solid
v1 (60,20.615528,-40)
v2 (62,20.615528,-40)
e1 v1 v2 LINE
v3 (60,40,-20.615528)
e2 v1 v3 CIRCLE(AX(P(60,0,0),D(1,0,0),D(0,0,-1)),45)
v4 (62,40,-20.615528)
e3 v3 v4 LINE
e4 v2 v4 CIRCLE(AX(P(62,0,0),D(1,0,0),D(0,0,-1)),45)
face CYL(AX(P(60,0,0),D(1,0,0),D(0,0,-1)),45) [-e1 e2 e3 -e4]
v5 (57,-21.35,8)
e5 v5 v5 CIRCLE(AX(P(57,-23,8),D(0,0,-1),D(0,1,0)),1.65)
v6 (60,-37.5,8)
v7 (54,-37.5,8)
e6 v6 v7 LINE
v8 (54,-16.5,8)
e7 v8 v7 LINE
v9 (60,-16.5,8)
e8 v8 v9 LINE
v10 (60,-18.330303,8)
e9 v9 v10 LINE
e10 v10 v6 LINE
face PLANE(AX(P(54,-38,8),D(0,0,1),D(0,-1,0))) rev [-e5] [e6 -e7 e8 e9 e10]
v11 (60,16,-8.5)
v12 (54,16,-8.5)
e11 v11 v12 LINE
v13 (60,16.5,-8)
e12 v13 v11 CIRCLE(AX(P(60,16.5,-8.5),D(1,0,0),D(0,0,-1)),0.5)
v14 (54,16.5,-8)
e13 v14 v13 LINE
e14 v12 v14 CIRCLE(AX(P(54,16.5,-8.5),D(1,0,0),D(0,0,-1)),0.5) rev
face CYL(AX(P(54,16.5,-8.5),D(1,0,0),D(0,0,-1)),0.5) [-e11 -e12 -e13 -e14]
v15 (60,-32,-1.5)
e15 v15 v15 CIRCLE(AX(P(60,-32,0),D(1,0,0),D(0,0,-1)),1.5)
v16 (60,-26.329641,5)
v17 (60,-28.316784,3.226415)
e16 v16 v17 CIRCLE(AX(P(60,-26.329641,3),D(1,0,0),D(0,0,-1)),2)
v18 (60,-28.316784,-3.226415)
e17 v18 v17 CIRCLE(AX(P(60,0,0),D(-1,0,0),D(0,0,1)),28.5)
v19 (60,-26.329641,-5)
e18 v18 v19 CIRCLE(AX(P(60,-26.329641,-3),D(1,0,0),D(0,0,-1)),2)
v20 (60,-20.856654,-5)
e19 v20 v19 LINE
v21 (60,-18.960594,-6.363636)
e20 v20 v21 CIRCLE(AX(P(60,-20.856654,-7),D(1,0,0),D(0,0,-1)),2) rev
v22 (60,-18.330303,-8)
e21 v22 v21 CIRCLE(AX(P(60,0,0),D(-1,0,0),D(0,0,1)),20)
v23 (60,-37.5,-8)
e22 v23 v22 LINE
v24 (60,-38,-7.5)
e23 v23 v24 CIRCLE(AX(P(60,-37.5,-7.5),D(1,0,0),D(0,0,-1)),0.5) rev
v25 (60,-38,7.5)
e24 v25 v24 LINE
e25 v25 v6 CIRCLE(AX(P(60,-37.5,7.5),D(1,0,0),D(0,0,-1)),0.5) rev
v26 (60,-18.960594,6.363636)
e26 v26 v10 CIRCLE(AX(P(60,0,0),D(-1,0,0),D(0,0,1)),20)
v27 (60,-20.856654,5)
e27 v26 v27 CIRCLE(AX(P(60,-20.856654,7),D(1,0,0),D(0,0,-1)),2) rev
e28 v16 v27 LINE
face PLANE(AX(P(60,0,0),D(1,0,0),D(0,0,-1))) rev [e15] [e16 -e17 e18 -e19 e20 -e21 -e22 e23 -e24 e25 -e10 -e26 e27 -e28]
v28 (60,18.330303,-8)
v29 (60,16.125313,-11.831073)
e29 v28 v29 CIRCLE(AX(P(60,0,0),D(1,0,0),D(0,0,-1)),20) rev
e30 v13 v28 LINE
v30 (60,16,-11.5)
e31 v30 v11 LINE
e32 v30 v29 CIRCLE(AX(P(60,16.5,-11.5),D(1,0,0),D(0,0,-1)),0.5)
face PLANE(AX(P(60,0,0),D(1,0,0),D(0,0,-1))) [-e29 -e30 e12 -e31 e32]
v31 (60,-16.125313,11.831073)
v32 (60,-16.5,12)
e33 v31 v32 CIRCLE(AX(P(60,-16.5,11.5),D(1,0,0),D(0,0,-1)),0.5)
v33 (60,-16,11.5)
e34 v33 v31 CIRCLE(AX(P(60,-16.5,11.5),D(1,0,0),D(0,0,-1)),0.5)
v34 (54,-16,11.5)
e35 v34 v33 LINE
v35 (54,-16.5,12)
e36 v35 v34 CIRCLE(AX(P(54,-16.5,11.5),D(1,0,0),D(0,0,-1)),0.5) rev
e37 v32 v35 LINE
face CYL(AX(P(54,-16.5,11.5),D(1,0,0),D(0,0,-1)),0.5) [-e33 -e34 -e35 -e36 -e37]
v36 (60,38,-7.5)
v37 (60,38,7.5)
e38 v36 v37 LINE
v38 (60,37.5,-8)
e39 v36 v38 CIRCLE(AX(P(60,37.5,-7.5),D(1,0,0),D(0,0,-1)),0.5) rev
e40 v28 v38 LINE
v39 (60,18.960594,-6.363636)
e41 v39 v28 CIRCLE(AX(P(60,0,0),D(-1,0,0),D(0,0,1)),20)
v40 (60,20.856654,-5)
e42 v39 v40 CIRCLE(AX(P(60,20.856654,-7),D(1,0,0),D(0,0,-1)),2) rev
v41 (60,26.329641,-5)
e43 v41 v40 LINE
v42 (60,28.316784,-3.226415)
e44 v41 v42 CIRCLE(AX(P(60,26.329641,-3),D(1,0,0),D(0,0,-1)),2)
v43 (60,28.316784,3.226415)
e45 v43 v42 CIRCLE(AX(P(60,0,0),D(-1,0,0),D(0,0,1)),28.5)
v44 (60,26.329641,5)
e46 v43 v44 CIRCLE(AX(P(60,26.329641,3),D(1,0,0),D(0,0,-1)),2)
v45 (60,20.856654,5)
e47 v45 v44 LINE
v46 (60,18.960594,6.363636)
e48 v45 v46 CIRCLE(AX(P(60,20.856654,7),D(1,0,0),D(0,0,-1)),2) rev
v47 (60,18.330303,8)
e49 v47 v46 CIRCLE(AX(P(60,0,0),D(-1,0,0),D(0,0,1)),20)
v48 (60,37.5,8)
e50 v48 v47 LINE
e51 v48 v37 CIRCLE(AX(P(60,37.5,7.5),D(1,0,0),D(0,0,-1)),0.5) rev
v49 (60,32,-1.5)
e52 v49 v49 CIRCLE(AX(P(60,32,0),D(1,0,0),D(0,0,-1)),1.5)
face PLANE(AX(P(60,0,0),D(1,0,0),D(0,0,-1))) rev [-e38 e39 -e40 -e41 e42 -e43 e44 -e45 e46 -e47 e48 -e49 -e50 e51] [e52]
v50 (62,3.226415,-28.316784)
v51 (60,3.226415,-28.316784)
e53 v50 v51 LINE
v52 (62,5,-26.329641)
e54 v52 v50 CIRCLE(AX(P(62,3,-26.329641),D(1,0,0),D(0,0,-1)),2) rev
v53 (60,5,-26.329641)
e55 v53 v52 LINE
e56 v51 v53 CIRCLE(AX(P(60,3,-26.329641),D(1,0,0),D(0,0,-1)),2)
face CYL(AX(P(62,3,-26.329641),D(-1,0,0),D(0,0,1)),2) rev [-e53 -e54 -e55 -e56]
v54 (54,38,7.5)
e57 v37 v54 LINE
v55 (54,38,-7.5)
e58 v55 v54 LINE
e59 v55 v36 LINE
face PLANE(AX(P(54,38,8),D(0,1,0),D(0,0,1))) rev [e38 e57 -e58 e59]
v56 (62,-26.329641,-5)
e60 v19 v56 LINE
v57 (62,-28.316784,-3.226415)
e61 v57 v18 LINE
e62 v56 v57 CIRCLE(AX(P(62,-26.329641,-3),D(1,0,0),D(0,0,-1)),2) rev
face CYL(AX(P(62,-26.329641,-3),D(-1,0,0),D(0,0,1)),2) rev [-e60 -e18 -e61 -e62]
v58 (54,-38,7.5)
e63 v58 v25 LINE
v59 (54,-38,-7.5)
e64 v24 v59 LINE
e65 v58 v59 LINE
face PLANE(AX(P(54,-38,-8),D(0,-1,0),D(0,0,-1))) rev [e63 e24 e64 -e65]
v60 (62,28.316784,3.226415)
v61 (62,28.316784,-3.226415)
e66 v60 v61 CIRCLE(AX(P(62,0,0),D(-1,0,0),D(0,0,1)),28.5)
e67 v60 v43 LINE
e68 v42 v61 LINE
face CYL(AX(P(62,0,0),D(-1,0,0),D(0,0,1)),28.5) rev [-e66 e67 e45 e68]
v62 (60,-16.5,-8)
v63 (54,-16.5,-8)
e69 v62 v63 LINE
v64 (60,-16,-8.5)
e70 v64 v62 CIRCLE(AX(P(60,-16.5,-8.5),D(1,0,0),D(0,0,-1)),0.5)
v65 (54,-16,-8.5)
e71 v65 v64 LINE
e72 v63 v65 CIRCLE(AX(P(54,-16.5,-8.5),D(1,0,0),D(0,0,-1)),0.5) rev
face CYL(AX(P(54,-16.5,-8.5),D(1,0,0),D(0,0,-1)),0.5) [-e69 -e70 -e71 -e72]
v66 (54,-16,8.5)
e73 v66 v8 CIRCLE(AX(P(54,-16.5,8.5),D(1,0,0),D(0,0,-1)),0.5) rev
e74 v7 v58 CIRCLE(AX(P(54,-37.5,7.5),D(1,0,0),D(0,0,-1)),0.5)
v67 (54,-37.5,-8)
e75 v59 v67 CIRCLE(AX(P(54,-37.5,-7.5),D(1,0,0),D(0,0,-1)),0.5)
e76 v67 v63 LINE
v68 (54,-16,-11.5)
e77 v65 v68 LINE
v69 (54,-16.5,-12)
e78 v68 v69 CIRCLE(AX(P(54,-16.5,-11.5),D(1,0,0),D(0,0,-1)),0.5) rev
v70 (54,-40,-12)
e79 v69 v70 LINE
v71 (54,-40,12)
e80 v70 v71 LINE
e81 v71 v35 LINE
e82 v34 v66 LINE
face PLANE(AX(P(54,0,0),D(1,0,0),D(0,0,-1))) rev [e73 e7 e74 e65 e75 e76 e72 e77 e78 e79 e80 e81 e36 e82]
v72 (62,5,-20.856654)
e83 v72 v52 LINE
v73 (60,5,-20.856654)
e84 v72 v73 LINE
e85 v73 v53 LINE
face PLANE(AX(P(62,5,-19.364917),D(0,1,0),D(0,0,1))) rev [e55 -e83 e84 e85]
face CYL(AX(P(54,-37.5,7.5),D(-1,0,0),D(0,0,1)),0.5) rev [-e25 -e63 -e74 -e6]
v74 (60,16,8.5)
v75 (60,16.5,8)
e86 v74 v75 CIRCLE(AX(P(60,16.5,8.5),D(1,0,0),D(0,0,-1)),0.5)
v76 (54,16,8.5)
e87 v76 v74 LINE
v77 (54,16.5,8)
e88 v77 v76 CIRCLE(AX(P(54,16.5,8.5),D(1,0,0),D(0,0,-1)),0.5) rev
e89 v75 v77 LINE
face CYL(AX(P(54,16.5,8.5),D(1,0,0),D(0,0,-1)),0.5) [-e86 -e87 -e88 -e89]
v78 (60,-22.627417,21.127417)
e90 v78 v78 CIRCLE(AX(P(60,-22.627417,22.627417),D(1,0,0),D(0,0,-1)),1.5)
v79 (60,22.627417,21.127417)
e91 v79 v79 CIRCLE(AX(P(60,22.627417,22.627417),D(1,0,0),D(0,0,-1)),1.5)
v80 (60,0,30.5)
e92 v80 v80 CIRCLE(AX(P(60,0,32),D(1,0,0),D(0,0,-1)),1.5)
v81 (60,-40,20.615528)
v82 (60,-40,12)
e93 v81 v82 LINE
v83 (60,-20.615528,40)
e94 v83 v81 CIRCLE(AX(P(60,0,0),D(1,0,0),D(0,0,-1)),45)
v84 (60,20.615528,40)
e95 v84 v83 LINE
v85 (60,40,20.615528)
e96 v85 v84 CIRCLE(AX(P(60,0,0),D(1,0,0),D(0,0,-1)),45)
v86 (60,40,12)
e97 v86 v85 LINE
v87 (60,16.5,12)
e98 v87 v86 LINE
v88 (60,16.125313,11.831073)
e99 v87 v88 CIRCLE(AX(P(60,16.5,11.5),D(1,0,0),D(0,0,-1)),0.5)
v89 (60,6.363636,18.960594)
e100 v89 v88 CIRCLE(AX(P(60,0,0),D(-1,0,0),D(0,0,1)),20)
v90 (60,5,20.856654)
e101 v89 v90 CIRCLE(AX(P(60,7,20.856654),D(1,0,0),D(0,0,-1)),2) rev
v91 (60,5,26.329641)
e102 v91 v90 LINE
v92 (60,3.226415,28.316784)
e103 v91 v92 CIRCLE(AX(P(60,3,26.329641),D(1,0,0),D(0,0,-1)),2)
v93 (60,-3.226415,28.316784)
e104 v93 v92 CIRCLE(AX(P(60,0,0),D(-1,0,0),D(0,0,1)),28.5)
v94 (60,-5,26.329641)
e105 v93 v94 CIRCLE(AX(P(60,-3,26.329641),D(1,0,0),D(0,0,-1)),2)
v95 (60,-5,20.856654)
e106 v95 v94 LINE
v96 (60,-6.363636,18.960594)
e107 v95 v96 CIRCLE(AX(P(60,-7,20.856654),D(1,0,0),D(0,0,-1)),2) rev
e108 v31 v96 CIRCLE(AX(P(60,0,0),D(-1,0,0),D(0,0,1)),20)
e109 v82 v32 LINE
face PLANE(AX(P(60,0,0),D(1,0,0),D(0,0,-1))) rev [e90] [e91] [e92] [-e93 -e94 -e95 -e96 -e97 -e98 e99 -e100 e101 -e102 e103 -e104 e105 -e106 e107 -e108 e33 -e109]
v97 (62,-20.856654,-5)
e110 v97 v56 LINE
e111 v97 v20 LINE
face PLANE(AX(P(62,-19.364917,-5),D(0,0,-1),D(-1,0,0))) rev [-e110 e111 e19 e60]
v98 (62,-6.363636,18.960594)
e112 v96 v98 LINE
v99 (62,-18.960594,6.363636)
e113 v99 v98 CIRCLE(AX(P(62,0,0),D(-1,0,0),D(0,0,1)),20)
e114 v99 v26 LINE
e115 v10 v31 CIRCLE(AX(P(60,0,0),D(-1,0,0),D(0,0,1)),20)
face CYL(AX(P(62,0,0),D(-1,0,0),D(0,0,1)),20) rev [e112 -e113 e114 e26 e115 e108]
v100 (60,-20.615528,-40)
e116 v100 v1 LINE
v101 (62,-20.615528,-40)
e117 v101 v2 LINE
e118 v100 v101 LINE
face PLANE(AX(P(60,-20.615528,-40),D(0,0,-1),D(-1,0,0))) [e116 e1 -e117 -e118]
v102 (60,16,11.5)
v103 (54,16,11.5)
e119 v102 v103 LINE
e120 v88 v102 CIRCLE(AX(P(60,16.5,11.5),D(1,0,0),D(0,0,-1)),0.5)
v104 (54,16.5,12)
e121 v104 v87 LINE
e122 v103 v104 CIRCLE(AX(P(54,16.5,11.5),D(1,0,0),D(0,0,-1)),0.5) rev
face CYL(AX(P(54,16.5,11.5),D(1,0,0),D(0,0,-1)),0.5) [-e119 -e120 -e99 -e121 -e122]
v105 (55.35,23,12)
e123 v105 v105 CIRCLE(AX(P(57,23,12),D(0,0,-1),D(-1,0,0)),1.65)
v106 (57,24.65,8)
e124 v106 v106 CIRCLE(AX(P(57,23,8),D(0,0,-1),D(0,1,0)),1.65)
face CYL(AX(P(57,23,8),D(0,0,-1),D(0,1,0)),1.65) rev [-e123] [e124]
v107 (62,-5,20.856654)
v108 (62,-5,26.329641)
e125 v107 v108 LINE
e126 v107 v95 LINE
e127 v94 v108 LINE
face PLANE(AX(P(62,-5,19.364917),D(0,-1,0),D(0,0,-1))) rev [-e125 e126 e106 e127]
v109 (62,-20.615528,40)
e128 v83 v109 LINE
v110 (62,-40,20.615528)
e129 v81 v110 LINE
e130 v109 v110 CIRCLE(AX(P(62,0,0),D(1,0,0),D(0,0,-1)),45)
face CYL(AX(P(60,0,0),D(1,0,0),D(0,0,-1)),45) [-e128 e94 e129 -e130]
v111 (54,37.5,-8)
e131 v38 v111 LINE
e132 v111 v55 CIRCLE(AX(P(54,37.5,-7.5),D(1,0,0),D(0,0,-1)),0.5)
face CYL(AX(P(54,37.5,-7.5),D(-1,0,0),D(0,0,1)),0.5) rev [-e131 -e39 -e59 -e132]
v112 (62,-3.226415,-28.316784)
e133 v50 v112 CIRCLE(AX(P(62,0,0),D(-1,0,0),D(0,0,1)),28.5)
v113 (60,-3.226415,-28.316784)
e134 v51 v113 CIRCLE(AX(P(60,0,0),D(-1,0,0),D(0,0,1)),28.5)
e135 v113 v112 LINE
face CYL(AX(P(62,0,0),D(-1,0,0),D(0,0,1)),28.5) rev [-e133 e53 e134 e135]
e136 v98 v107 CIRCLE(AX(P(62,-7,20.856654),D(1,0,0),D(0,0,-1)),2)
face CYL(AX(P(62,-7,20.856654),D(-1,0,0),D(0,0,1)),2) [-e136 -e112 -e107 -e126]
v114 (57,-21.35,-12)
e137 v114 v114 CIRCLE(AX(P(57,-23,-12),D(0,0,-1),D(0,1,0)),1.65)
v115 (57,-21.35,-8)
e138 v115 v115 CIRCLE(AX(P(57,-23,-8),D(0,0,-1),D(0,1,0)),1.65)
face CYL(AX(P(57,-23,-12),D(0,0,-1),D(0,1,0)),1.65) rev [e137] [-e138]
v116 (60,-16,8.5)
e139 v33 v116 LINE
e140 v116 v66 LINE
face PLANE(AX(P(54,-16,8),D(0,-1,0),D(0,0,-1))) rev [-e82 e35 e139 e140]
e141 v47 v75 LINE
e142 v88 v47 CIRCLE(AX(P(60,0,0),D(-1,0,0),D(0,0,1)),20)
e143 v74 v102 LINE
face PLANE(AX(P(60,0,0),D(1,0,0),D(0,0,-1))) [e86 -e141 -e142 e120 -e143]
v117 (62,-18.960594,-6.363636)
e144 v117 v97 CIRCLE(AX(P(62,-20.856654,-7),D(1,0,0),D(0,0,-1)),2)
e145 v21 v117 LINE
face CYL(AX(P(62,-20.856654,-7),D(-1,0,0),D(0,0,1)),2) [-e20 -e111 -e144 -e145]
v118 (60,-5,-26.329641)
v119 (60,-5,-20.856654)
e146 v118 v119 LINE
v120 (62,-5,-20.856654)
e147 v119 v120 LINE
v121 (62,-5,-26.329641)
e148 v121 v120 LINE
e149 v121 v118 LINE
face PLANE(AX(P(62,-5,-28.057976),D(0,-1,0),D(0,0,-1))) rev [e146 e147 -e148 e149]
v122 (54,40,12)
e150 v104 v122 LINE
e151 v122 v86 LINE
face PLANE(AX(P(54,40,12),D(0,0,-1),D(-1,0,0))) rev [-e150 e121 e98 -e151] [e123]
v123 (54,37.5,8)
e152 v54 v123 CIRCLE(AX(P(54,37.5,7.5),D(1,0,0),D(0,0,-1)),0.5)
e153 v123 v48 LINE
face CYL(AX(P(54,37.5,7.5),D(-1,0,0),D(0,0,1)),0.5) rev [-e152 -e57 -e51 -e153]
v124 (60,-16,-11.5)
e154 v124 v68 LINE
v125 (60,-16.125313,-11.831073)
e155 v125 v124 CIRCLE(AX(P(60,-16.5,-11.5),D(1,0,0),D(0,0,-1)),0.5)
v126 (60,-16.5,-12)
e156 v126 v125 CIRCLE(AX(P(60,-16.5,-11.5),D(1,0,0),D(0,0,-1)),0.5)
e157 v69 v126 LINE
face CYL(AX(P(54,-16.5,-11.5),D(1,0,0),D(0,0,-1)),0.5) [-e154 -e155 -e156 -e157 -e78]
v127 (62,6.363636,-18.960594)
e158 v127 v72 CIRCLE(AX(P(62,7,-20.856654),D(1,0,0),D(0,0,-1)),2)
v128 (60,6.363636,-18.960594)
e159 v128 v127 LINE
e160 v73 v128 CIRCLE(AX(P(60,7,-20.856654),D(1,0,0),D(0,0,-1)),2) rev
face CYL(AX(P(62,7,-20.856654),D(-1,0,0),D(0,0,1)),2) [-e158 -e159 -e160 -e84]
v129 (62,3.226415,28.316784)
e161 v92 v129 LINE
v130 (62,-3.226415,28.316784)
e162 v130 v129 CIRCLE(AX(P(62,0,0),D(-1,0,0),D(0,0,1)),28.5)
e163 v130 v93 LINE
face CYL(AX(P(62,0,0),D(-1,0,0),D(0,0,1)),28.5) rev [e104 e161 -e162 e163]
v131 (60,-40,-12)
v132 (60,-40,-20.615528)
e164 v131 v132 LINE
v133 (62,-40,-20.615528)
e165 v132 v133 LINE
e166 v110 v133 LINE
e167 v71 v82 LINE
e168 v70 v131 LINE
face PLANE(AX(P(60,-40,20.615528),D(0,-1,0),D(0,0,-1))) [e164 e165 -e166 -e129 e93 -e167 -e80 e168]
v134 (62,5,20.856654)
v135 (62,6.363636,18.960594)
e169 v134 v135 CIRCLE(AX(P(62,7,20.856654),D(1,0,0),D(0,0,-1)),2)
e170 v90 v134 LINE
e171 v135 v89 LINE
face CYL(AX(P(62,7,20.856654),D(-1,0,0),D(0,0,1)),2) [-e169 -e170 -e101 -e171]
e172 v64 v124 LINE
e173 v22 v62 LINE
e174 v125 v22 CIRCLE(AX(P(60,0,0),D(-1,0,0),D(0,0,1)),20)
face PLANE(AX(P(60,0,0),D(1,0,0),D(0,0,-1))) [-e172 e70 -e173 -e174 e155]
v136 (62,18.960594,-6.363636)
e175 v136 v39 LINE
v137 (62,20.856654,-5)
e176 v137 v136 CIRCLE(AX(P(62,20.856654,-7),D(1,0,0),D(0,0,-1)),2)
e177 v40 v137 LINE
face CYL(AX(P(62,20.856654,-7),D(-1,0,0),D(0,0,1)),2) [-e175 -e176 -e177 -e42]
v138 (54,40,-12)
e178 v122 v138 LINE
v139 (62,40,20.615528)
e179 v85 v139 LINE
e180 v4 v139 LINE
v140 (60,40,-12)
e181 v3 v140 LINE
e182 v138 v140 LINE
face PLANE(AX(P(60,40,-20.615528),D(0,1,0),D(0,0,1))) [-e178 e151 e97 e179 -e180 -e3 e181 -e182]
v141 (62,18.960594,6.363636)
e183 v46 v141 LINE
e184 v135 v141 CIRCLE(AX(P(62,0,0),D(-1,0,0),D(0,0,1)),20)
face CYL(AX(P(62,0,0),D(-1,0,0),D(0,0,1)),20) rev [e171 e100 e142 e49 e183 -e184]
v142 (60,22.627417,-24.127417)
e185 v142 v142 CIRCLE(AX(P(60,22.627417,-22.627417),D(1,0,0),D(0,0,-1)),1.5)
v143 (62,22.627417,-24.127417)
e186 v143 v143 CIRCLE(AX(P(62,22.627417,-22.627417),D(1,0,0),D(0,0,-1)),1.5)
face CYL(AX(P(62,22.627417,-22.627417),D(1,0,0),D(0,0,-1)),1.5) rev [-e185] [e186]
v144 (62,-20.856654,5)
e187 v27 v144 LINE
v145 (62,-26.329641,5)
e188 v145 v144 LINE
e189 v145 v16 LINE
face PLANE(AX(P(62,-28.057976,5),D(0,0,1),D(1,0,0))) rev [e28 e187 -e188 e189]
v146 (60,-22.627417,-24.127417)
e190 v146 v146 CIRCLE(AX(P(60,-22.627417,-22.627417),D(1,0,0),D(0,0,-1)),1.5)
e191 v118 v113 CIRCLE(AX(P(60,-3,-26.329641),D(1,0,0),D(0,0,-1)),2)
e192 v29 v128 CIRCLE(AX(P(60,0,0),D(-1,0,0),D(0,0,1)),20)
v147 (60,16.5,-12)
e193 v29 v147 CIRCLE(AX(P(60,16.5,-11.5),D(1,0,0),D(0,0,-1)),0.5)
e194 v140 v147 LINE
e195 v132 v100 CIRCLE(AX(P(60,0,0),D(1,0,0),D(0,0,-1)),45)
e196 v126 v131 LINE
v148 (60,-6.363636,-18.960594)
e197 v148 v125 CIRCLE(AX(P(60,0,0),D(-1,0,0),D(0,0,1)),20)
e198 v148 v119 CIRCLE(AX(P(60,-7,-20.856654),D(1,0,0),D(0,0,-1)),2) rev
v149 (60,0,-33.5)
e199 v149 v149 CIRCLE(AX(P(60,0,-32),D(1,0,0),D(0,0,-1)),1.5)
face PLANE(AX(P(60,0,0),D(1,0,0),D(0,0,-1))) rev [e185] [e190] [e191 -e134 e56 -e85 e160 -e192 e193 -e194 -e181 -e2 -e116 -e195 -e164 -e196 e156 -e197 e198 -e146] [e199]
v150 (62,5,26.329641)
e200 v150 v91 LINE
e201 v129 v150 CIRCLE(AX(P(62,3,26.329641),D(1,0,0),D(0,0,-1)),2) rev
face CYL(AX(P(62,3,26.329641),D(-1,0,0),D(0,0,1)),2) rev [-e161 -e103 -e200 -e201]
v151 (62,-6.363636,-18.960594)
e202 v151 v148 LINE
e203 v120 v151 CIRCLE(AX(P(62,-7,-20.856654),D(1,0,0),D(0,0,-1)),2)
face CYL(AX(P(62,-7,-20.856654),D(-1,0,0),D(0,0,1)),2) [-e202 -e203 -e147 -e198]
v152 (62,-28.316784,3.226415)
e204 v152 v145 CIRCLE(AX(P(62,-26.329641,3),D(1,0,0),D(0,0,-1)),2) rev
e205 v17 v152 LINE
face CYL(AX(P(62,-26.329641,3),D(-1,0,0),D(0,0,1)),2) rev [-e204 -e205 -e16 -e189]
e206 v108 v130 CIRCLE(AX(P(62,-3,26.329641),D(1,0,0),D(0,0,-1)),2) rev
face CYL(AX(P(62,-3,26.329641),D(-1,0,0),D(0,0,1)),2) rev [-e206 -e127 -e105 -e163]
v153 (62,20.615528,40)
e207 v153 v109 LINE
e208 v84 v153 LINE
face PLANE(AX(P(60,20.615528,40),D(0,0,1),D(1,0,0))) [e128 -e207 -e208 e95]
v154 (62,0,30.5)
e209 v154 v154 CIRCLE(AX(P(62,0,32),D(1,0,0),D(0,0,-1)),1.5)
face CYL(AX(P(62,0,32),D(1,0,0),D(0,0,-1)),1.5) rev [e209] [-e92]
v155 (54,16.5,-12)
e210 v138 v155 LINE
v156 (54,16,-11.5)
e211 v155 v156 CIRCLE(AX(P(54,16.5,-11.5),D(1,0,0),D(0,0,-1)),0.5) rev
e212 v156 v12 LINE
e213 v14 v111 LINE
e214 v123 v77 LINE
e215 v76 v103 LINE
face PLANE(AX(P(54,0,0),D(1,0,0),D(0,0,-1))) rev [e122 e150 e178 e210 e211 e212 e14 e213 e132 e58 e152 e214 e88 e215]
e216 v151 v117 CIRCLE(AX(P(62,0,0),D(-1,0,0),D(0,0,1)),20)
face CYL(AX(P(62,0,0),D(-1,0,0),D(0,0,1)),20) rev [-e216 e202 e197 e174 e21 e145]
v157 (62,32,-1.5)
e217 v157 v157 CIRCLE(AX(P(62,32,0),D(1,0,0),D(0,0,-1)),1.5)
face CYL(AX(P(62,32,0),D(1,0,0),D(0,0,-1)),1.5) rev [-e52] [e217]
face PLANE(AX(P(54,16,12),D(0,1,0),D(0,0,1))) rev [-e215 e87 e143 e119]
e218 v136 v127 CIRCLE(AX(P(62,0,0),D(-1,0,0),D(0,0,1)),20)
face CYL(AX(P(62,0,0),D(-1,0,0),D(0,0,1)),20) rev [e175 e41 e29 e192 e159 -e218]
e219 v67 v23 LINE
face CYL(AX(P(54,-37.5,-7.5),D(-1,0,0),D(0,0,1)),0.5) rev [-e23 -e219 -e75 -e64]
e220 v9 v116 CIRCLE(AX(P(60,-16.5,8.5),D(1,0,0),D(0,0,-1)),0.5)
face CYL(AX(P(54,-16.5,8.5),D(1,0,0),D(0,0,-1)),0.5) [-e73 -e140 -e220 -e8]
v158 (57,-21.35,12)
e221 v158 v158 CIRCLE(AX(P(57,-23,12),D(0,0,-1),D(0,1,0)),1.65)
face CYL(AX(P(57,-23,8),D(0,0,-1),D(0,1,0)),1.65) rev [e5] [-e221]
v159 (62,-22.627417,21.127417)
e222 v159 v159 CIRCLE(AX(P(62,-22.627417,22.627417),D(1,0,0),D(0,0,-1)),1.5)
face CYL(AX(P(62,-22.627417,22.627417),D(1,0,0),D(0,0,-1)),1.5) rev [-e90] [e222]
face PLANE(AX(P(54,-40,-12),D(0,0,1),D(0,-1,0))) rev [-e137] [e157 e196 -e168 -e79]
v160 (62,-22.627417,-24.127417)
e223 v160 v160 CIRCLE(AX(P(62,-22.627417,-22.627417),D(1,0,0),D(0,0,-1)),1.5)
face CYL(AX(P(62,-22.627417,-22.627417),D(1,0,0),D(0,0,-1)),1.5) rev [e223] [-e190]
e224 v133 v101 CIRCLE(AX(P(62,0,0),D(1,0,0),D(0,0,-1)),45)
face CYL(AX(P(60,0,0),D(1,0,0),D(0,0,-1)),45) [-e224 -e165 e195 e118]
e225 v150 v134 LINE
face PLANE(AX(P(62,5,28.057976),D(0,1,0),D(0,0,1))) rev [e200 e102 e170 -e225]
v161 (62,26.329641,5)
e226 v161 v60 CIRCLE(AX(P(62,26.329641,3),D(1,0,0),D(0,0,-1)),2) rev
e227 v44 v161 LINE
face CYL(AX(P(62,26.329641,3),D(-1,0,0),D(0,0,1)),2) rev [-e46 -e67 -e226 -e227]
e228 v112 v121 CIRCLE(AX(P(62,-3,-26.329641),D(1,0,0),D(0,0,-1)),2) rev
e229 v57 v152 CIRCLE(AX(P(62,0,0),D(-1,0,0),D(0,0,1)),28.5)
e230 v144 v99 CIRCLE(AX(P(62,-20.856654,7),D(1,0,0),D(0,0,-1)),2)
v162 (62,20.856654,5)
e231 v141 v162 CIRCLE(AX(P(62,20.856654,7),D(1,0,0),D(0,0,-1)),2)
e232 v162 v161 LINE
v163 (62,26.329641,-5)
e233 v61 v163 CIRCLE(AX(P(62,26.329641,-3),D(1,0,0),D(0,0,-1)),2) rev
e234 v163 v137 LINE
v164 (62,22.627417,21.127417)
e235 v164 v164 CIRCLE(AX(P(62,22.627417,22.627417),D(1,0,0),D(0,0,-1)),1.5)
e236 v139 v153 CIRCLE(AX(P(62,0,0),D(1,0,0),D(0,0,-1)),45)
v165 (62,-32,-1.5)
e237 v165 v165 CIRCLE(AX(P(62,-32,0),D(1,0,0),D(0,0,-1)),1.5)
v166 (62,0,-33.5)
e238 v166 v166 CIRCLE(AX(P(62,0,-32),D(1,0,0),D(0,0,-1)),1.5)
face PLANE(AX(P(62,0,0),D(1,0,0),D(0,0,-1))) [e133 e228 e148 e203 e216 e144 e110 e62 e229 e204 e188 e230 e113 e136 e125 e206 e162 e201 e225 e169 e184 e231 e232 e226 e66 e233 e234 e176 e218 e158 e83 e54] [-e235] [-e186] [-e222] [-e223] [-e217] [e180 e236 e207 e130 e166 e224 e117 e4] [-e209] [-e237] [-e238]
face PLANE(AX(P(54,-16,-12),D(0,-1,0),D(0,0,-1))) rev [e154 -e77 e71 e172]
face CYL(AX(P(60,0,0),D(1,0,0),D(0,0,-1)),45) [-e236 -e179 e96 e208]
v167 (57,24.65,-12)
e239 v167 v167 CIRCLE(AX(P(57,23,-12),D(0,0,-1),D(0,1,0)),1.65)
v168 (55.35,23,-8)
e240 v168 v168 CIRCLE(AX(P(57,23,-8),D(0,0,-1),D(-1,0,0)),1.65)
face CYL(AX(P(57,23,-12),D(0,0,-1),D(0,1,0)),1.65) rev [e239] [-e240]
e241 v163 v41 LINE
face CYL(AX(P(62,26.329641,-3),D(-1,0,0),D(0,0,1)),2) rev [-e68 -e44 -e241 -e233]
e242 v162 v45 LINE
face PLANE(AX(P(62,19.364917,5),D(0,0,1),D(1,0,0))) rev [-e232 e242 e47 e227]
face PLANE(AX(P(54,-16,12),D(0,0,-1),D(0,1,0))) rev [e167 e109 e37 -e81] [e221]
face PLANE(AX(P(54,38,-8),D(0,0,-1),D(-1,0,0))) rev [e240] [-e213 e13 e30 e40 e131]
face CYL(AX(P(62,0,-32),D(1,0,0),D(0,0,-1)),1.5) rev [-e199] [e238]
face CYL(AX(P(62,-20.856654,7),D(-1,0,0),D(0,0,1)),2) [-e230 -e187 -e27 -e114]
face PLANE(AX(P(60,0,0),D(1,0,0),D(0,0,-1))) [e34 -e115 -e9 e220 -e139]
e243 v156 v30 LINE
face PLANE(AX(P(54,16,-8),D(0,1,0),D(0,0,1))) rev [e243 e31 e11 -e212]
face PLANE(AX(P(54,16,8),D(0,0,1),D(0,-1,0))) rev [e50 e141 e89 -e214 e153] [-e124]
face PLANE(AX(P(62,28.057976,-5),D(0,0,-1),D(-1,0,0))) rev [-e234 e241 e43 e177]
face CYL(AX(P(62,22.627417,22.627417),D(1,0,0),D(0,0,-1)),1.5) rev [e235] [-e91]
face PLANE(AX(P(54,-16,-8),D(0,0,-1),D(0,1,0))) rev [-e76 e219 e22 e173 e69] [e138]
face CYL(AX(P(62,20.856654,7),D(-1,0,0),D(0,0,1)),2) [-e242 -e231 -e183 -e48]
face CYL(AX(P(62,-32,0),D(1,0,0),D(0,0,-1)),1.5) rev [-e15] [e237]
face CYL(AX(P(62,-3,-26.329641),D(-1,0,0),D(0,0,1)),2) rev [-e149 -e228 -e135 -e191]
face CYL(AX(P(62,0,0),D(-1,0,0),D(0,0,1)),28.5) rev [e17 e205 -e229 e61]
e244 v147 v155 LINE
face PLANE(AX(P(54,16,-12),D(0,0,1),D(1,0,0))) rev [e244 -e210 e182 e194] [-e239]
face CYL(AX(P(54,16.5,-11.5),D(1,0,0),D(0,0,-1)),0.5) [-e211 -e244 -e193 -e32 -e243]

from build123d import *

# Parameters (mm, degrees)
EXTRUDE_1_DEPTH                  = 2
CUT_EXTRUDE_1_DEPTH              = 57.603886792
EXTRUDE_2_DEPTH                  = 6
EXTRUDE_3_DEPTH                  = 6
SKETCH_5_W                       = 1.65
SKETCH_5_H                       = 32
HOLE_WIZARD_3_3_3_3_1_AT_2_COUNT = 2
HOLE_WIZARD_3_3_3_3_1_AT_2_PITCH = 46
HOLE_WIZARD_3_3_3_3_2_D          = 3.3
HOLE_WIZARD_3_3_3_3_2_DEPTH      = 52
HOLE_WIZARD_3_0_3_1_D            = 3
HOLE_WIZARD_3_0_3_1_DEPTH        = 8
FILLET_1_R                       = 0.5
FILLET_2_R                       = 2


with BuildPart() as part:
    # 草图1 → 凸台-拉伸1 (new body)
    with BuildSketch(Plane(origin=(62, 0, 0), x_dir=(0, 0, -1), z_dir=(1, 0, 0))):
        with BuildLine():
            Line((20.615528128, 40), (-20.615528128, 40))
            ThreePointArc((-20.615528128, 40), (-31.819805153, 31.819805153), (-40, 20.615528128))
            Line((-40, 20.615528128), (-40, -20.615528128))
            ThreePointArc((-40, -20.615528128), (-31.819805153, -31.819805153), (-20.615528128, -40))
            Line((-20.615528128, -40), (20.615528128, -40))
            ThreePointArc((20.615528128, -40), (31.819805153, -31.819805153), (40, -20.615528128))
            Line((40, -20.615528128), (40, 20.615528128))
            ThreePointArc((40, 20.615528128), (31.819805153, 31.819805153), (20.615528128, 40))
        make_face()
    extrude(amount=-EXTRUDE_1_DEPTH)

    # 草图2 → 切除-拉伸1 (cut, through all)
    with BuildSketch(Plane.ZY.offset(-60)):
        with BuildLine():
            Line((5, -28.057975693), (5, -19.364916731))
            ThreePointArc((5, -19.364916731), (14.142135624, -14.142135624), (19.364916731, -5))
            Line((19.364916731, -5), (28.057975693, -5))
            ThreePointArc((28.057975693, -5), (28.5, 0), (28.057975693, 5))
            Line((28.057975693, 5), (19.364916731, 5))
            ThreePointArc((19.364916731, 5), (14.142135624, 14.142135624), (5, 19.364916731))
            Line((5, 19.364916731), (5, 28.057975693))
            ThreePointArc((5, 28.057975693), (0, 28.5), (-5, 28.057975693))
            Line((-5, 28.057975693), (-5, 19.364916731))
            ThreePointArc((-5, 19.364916731), (-14.142135624, 14.142135624), (-19.364916731, 5))
            Line((-19.364916731, 5), (-28.057975693, 5))
            ThreePointArc((-28.057975693, 5), (-28.5, 0), (-28.057975693, -5))
            Line((-28.057975693, -5), (-19.364916731, -5))
            ThreePointArc((-19.364916731, -5), (-14.142135624, -14.142135624), (-5, -19.364916731))
            Line((-5, -19.364916731), (-5, -28.057975693))
            ThreePointArc((-5, -28.057975693), (0, -28.5), (5, -28.057975693))
        make_face()
    extrude(amount=-CUT_EXTRUDE_1_DEPTH, mode=Mode.SUBTRACT)

    # 草图3 → 凸台-拉伸2 (add)
    with BuildSketch(Plane.ZY.offset(-60)):
        Polygon((12, -16), (12, -40), (-12, -40), (-12, -16), (-8, -16), (-8, -38), (8, -38), (8, -16), align=None)
    extrude(amount=EXTRUDE_2_DEPTH)

    # 草图4 → 凸台-拉伸3 (add)
    with BuildSketch(Plane.ZY.offset(-60)):
        Polygon((12, 16), (8, 16), (8, 38), (-8, 38), (-8, 16), (-12, 16), (-12, 40), (12, 40), align=None)
    extrude(amount=EXTRUDE_3_DEPTH)

    # 草图5 → Ø3.3 (3.3) 直径孔1 (revolve, cut)
    with BuildSketch(Plane(origin=(57, -23, 8), x_dir=(0, 1, 0), z_dir=(1, 0, 0))):
        with Locations((0.825, 16)):
            Rectangle(SKETCH_5_W, SKETCH_5_H)
    hole_wizard_3_3_3_3_1 = revolve(axis=Axis((57, -23, 1.65), (0, 0, 1)), mode=Mode.SUBTRACT)

    # Ø3.3 (3.3) 直径孔1 at 2: Ø3.3 (3.3) 直径孔1 ×2
    with Locations(*[(0, i * HOLE_WIZARD_3_3_3_3_1_AT_2_PITCH, 0) for i in range(1, HOLE_WIZARD_3_3_3_3_1_AT_2_COUNT)]):
        add(hole_wizard_3_3_3_3_1, mode=Mode.SUBTRACT)

    # Ø3.3 (3.3) 直径孔2
    with Locations(Plane(origin=(0, 0, -12), x_dir=(-1, 0, 0), z_dir=(0, 0, -1))):
        with Locations((-57, -23), (-57, 23)):
            Hole(HOLE_WIZARD_3_3_3_3_2_D / 2, depth=HOLE_WIZARD_3_3_3_3_2_DEPTH)

    # Ø3.0 (3) 直径孔1
    with Locations(Plane(origin=(62, 0, 0), x_dir=(0, 0, -1), z_dir=(1, 0, 0))):
        with Locations((0, 32), (-22.627416998, 22.627416998), (-32, 0), (-22.627416998, -22.627416998), (0, -32), (22.627416998, -22.627416998), (32, 0), (22.627416998, 22.627416998)):
            Hole(HOLE_WIZARD_3_0_3_1_D / 2, depth=HOLE_WIZARD_3_0_3_1_DEPTH)

    # 圆角1
    # the kernel refuses this fillet: 0.5 mm, written as the material it adds along each edge
    with BuildSketch(Plane(origin=(61.25, 38, -8), x_dir=(0, 0, 1), z_dir=(-1, 0, 0)), Plane(origin=(61.25, 38, 8), x_dir=(0, -1, 0), z_dir=(-1, 0, 0)), Plane(origin=(61.25, -38, 8), x_dir=(0, 0, -1), z_dir=(-1, 0, 0)), Plane(origin=(61.25, -38, -8), x_dir=(0, 1, 0), z_dir=(-1, 0, 0))) as fillet_1_piece_1:
        with BuildLine():
            CenterArc((FILLET_1_R, -FILLET_1_R), FILLET_1_R, 90, 90)
            Line((0, -FILLET_1_R), (0, 0))
            Line((0, 0), (FILLET_1_R, 0))
        make_face()
    extrude(amount=7.25)
    # the kernel refuses this fillet: 0.5 mm, written as the material it takes off along each edge
    with BuildSketch(Plane(origin=(60, 16, 12), x_dir=(0, 1, 0), z_dir=(-1, 0, 0)), Plane(origin=(60, -16, -12), x_dir=(0, -1, 0), z_dir=(-1, 0, 0))) as fillet_1_2_piece_1:
        with BuildLine():
            CenterArc((FILLET_1_R, FILLET_1_R), FILLET_1_R, 180, 90)
            Line((0, FILLET_1_R), (0, 0))
            Line((0, 0), (FILLET_1_R, 0))
        make_face()
    extrude(amount=7.25, mode=Mode.SUBTRACT)
    with BuildSketch(Plane(origin=(60, 16, -12), x_dir=(0, 1, 0), z_dir=(-1, 0, 0)), Plane(origin=(60, -16, 12), x_dir=(0, -1, 0), z_dir=(-1, 0, 0))) as fillet_1_2_piece_2:
        with BuildLine():
            CenterArc((FILLET_1_R, -FILLET_1_R), FILLET_1_R, 90, 90)
            Line((0, -FILLET_1_R), (0, 0))
            Line((0, 0), (FILLET_1_R, 0))
        make_face()
    extrude(amount=7.25, mode=Mode.SUBTRACT)
    with BuildSketch(Plane(origin=(61.25, 16, -8), x_dir=(0, 0, -1), z_dir=(-1, 0, 0)), Plane(origin=(61.25, -16, 8), x_dir=(0, 0, 1), z_dir=(-1, 0, 0))) as fillet_1_2_piece_3:
        with BuildLine():
            CenterArc((FILLET_1_R, -FILLET_1_R), FILLET_1_R, 90, 90)
            Line((0, -FILLET_1_R), (0, 0))
            Line((0, 0), (FILLET_1_R, 0))
        make_face()
    extrude(amount=8.5, mode=Mode.SUBTRACT)
    with BuildSketch(Plane(origin=(61.25, 16, 8), x_dir=(0, 0, 1), z_dir=(-1, 0, 0)), Plane(origin=(61.25, -16, -8), x_dir=(0, 0, -1), z_dir=(-1, 0, 0))) as fillet_1_2_piece_4:
        with BuildLine():
            CenterArc((FILLET_1_R, FILLET_1_R), FILLET_1_R, 180, 90)
            Line((0, FILLET_1_R), (0, 0))
            Line((0, 0), (FILLET_1_R, 0))
        make_face()
    extrude(amount=8.5, mode=Mode.SUBTRACT)

    # 圆角2
    fillet_2_edges = [part.edges().sort_by_distance(p)[0] for p in [
        (61, -28.057975693, 5),
        (61, -28.057975693, -5),
        (61, -19.364916731, -5),
        (61, -5, -19.364916731),
        (61, -5, -28.057975693),
        (61, 5, -28.057975693),
        (61, 5, -19.364916731),
        (61, 19.364916731, -5),
        (61, 28.057975693, -5),
        (61, 28.057975693, 5),
        (61, 19.364916731, 5),
        (61, 5, 19.364916731),
        (61, 5, 28.057975693),
        (61, -5, 28.057975693),
        (61, -5, 19.364916731),
        (61, -19.364916731, 5),
    ]]
    fillet(fillet_2_edges, radius=FILLET_2_R)


solid = part.part
